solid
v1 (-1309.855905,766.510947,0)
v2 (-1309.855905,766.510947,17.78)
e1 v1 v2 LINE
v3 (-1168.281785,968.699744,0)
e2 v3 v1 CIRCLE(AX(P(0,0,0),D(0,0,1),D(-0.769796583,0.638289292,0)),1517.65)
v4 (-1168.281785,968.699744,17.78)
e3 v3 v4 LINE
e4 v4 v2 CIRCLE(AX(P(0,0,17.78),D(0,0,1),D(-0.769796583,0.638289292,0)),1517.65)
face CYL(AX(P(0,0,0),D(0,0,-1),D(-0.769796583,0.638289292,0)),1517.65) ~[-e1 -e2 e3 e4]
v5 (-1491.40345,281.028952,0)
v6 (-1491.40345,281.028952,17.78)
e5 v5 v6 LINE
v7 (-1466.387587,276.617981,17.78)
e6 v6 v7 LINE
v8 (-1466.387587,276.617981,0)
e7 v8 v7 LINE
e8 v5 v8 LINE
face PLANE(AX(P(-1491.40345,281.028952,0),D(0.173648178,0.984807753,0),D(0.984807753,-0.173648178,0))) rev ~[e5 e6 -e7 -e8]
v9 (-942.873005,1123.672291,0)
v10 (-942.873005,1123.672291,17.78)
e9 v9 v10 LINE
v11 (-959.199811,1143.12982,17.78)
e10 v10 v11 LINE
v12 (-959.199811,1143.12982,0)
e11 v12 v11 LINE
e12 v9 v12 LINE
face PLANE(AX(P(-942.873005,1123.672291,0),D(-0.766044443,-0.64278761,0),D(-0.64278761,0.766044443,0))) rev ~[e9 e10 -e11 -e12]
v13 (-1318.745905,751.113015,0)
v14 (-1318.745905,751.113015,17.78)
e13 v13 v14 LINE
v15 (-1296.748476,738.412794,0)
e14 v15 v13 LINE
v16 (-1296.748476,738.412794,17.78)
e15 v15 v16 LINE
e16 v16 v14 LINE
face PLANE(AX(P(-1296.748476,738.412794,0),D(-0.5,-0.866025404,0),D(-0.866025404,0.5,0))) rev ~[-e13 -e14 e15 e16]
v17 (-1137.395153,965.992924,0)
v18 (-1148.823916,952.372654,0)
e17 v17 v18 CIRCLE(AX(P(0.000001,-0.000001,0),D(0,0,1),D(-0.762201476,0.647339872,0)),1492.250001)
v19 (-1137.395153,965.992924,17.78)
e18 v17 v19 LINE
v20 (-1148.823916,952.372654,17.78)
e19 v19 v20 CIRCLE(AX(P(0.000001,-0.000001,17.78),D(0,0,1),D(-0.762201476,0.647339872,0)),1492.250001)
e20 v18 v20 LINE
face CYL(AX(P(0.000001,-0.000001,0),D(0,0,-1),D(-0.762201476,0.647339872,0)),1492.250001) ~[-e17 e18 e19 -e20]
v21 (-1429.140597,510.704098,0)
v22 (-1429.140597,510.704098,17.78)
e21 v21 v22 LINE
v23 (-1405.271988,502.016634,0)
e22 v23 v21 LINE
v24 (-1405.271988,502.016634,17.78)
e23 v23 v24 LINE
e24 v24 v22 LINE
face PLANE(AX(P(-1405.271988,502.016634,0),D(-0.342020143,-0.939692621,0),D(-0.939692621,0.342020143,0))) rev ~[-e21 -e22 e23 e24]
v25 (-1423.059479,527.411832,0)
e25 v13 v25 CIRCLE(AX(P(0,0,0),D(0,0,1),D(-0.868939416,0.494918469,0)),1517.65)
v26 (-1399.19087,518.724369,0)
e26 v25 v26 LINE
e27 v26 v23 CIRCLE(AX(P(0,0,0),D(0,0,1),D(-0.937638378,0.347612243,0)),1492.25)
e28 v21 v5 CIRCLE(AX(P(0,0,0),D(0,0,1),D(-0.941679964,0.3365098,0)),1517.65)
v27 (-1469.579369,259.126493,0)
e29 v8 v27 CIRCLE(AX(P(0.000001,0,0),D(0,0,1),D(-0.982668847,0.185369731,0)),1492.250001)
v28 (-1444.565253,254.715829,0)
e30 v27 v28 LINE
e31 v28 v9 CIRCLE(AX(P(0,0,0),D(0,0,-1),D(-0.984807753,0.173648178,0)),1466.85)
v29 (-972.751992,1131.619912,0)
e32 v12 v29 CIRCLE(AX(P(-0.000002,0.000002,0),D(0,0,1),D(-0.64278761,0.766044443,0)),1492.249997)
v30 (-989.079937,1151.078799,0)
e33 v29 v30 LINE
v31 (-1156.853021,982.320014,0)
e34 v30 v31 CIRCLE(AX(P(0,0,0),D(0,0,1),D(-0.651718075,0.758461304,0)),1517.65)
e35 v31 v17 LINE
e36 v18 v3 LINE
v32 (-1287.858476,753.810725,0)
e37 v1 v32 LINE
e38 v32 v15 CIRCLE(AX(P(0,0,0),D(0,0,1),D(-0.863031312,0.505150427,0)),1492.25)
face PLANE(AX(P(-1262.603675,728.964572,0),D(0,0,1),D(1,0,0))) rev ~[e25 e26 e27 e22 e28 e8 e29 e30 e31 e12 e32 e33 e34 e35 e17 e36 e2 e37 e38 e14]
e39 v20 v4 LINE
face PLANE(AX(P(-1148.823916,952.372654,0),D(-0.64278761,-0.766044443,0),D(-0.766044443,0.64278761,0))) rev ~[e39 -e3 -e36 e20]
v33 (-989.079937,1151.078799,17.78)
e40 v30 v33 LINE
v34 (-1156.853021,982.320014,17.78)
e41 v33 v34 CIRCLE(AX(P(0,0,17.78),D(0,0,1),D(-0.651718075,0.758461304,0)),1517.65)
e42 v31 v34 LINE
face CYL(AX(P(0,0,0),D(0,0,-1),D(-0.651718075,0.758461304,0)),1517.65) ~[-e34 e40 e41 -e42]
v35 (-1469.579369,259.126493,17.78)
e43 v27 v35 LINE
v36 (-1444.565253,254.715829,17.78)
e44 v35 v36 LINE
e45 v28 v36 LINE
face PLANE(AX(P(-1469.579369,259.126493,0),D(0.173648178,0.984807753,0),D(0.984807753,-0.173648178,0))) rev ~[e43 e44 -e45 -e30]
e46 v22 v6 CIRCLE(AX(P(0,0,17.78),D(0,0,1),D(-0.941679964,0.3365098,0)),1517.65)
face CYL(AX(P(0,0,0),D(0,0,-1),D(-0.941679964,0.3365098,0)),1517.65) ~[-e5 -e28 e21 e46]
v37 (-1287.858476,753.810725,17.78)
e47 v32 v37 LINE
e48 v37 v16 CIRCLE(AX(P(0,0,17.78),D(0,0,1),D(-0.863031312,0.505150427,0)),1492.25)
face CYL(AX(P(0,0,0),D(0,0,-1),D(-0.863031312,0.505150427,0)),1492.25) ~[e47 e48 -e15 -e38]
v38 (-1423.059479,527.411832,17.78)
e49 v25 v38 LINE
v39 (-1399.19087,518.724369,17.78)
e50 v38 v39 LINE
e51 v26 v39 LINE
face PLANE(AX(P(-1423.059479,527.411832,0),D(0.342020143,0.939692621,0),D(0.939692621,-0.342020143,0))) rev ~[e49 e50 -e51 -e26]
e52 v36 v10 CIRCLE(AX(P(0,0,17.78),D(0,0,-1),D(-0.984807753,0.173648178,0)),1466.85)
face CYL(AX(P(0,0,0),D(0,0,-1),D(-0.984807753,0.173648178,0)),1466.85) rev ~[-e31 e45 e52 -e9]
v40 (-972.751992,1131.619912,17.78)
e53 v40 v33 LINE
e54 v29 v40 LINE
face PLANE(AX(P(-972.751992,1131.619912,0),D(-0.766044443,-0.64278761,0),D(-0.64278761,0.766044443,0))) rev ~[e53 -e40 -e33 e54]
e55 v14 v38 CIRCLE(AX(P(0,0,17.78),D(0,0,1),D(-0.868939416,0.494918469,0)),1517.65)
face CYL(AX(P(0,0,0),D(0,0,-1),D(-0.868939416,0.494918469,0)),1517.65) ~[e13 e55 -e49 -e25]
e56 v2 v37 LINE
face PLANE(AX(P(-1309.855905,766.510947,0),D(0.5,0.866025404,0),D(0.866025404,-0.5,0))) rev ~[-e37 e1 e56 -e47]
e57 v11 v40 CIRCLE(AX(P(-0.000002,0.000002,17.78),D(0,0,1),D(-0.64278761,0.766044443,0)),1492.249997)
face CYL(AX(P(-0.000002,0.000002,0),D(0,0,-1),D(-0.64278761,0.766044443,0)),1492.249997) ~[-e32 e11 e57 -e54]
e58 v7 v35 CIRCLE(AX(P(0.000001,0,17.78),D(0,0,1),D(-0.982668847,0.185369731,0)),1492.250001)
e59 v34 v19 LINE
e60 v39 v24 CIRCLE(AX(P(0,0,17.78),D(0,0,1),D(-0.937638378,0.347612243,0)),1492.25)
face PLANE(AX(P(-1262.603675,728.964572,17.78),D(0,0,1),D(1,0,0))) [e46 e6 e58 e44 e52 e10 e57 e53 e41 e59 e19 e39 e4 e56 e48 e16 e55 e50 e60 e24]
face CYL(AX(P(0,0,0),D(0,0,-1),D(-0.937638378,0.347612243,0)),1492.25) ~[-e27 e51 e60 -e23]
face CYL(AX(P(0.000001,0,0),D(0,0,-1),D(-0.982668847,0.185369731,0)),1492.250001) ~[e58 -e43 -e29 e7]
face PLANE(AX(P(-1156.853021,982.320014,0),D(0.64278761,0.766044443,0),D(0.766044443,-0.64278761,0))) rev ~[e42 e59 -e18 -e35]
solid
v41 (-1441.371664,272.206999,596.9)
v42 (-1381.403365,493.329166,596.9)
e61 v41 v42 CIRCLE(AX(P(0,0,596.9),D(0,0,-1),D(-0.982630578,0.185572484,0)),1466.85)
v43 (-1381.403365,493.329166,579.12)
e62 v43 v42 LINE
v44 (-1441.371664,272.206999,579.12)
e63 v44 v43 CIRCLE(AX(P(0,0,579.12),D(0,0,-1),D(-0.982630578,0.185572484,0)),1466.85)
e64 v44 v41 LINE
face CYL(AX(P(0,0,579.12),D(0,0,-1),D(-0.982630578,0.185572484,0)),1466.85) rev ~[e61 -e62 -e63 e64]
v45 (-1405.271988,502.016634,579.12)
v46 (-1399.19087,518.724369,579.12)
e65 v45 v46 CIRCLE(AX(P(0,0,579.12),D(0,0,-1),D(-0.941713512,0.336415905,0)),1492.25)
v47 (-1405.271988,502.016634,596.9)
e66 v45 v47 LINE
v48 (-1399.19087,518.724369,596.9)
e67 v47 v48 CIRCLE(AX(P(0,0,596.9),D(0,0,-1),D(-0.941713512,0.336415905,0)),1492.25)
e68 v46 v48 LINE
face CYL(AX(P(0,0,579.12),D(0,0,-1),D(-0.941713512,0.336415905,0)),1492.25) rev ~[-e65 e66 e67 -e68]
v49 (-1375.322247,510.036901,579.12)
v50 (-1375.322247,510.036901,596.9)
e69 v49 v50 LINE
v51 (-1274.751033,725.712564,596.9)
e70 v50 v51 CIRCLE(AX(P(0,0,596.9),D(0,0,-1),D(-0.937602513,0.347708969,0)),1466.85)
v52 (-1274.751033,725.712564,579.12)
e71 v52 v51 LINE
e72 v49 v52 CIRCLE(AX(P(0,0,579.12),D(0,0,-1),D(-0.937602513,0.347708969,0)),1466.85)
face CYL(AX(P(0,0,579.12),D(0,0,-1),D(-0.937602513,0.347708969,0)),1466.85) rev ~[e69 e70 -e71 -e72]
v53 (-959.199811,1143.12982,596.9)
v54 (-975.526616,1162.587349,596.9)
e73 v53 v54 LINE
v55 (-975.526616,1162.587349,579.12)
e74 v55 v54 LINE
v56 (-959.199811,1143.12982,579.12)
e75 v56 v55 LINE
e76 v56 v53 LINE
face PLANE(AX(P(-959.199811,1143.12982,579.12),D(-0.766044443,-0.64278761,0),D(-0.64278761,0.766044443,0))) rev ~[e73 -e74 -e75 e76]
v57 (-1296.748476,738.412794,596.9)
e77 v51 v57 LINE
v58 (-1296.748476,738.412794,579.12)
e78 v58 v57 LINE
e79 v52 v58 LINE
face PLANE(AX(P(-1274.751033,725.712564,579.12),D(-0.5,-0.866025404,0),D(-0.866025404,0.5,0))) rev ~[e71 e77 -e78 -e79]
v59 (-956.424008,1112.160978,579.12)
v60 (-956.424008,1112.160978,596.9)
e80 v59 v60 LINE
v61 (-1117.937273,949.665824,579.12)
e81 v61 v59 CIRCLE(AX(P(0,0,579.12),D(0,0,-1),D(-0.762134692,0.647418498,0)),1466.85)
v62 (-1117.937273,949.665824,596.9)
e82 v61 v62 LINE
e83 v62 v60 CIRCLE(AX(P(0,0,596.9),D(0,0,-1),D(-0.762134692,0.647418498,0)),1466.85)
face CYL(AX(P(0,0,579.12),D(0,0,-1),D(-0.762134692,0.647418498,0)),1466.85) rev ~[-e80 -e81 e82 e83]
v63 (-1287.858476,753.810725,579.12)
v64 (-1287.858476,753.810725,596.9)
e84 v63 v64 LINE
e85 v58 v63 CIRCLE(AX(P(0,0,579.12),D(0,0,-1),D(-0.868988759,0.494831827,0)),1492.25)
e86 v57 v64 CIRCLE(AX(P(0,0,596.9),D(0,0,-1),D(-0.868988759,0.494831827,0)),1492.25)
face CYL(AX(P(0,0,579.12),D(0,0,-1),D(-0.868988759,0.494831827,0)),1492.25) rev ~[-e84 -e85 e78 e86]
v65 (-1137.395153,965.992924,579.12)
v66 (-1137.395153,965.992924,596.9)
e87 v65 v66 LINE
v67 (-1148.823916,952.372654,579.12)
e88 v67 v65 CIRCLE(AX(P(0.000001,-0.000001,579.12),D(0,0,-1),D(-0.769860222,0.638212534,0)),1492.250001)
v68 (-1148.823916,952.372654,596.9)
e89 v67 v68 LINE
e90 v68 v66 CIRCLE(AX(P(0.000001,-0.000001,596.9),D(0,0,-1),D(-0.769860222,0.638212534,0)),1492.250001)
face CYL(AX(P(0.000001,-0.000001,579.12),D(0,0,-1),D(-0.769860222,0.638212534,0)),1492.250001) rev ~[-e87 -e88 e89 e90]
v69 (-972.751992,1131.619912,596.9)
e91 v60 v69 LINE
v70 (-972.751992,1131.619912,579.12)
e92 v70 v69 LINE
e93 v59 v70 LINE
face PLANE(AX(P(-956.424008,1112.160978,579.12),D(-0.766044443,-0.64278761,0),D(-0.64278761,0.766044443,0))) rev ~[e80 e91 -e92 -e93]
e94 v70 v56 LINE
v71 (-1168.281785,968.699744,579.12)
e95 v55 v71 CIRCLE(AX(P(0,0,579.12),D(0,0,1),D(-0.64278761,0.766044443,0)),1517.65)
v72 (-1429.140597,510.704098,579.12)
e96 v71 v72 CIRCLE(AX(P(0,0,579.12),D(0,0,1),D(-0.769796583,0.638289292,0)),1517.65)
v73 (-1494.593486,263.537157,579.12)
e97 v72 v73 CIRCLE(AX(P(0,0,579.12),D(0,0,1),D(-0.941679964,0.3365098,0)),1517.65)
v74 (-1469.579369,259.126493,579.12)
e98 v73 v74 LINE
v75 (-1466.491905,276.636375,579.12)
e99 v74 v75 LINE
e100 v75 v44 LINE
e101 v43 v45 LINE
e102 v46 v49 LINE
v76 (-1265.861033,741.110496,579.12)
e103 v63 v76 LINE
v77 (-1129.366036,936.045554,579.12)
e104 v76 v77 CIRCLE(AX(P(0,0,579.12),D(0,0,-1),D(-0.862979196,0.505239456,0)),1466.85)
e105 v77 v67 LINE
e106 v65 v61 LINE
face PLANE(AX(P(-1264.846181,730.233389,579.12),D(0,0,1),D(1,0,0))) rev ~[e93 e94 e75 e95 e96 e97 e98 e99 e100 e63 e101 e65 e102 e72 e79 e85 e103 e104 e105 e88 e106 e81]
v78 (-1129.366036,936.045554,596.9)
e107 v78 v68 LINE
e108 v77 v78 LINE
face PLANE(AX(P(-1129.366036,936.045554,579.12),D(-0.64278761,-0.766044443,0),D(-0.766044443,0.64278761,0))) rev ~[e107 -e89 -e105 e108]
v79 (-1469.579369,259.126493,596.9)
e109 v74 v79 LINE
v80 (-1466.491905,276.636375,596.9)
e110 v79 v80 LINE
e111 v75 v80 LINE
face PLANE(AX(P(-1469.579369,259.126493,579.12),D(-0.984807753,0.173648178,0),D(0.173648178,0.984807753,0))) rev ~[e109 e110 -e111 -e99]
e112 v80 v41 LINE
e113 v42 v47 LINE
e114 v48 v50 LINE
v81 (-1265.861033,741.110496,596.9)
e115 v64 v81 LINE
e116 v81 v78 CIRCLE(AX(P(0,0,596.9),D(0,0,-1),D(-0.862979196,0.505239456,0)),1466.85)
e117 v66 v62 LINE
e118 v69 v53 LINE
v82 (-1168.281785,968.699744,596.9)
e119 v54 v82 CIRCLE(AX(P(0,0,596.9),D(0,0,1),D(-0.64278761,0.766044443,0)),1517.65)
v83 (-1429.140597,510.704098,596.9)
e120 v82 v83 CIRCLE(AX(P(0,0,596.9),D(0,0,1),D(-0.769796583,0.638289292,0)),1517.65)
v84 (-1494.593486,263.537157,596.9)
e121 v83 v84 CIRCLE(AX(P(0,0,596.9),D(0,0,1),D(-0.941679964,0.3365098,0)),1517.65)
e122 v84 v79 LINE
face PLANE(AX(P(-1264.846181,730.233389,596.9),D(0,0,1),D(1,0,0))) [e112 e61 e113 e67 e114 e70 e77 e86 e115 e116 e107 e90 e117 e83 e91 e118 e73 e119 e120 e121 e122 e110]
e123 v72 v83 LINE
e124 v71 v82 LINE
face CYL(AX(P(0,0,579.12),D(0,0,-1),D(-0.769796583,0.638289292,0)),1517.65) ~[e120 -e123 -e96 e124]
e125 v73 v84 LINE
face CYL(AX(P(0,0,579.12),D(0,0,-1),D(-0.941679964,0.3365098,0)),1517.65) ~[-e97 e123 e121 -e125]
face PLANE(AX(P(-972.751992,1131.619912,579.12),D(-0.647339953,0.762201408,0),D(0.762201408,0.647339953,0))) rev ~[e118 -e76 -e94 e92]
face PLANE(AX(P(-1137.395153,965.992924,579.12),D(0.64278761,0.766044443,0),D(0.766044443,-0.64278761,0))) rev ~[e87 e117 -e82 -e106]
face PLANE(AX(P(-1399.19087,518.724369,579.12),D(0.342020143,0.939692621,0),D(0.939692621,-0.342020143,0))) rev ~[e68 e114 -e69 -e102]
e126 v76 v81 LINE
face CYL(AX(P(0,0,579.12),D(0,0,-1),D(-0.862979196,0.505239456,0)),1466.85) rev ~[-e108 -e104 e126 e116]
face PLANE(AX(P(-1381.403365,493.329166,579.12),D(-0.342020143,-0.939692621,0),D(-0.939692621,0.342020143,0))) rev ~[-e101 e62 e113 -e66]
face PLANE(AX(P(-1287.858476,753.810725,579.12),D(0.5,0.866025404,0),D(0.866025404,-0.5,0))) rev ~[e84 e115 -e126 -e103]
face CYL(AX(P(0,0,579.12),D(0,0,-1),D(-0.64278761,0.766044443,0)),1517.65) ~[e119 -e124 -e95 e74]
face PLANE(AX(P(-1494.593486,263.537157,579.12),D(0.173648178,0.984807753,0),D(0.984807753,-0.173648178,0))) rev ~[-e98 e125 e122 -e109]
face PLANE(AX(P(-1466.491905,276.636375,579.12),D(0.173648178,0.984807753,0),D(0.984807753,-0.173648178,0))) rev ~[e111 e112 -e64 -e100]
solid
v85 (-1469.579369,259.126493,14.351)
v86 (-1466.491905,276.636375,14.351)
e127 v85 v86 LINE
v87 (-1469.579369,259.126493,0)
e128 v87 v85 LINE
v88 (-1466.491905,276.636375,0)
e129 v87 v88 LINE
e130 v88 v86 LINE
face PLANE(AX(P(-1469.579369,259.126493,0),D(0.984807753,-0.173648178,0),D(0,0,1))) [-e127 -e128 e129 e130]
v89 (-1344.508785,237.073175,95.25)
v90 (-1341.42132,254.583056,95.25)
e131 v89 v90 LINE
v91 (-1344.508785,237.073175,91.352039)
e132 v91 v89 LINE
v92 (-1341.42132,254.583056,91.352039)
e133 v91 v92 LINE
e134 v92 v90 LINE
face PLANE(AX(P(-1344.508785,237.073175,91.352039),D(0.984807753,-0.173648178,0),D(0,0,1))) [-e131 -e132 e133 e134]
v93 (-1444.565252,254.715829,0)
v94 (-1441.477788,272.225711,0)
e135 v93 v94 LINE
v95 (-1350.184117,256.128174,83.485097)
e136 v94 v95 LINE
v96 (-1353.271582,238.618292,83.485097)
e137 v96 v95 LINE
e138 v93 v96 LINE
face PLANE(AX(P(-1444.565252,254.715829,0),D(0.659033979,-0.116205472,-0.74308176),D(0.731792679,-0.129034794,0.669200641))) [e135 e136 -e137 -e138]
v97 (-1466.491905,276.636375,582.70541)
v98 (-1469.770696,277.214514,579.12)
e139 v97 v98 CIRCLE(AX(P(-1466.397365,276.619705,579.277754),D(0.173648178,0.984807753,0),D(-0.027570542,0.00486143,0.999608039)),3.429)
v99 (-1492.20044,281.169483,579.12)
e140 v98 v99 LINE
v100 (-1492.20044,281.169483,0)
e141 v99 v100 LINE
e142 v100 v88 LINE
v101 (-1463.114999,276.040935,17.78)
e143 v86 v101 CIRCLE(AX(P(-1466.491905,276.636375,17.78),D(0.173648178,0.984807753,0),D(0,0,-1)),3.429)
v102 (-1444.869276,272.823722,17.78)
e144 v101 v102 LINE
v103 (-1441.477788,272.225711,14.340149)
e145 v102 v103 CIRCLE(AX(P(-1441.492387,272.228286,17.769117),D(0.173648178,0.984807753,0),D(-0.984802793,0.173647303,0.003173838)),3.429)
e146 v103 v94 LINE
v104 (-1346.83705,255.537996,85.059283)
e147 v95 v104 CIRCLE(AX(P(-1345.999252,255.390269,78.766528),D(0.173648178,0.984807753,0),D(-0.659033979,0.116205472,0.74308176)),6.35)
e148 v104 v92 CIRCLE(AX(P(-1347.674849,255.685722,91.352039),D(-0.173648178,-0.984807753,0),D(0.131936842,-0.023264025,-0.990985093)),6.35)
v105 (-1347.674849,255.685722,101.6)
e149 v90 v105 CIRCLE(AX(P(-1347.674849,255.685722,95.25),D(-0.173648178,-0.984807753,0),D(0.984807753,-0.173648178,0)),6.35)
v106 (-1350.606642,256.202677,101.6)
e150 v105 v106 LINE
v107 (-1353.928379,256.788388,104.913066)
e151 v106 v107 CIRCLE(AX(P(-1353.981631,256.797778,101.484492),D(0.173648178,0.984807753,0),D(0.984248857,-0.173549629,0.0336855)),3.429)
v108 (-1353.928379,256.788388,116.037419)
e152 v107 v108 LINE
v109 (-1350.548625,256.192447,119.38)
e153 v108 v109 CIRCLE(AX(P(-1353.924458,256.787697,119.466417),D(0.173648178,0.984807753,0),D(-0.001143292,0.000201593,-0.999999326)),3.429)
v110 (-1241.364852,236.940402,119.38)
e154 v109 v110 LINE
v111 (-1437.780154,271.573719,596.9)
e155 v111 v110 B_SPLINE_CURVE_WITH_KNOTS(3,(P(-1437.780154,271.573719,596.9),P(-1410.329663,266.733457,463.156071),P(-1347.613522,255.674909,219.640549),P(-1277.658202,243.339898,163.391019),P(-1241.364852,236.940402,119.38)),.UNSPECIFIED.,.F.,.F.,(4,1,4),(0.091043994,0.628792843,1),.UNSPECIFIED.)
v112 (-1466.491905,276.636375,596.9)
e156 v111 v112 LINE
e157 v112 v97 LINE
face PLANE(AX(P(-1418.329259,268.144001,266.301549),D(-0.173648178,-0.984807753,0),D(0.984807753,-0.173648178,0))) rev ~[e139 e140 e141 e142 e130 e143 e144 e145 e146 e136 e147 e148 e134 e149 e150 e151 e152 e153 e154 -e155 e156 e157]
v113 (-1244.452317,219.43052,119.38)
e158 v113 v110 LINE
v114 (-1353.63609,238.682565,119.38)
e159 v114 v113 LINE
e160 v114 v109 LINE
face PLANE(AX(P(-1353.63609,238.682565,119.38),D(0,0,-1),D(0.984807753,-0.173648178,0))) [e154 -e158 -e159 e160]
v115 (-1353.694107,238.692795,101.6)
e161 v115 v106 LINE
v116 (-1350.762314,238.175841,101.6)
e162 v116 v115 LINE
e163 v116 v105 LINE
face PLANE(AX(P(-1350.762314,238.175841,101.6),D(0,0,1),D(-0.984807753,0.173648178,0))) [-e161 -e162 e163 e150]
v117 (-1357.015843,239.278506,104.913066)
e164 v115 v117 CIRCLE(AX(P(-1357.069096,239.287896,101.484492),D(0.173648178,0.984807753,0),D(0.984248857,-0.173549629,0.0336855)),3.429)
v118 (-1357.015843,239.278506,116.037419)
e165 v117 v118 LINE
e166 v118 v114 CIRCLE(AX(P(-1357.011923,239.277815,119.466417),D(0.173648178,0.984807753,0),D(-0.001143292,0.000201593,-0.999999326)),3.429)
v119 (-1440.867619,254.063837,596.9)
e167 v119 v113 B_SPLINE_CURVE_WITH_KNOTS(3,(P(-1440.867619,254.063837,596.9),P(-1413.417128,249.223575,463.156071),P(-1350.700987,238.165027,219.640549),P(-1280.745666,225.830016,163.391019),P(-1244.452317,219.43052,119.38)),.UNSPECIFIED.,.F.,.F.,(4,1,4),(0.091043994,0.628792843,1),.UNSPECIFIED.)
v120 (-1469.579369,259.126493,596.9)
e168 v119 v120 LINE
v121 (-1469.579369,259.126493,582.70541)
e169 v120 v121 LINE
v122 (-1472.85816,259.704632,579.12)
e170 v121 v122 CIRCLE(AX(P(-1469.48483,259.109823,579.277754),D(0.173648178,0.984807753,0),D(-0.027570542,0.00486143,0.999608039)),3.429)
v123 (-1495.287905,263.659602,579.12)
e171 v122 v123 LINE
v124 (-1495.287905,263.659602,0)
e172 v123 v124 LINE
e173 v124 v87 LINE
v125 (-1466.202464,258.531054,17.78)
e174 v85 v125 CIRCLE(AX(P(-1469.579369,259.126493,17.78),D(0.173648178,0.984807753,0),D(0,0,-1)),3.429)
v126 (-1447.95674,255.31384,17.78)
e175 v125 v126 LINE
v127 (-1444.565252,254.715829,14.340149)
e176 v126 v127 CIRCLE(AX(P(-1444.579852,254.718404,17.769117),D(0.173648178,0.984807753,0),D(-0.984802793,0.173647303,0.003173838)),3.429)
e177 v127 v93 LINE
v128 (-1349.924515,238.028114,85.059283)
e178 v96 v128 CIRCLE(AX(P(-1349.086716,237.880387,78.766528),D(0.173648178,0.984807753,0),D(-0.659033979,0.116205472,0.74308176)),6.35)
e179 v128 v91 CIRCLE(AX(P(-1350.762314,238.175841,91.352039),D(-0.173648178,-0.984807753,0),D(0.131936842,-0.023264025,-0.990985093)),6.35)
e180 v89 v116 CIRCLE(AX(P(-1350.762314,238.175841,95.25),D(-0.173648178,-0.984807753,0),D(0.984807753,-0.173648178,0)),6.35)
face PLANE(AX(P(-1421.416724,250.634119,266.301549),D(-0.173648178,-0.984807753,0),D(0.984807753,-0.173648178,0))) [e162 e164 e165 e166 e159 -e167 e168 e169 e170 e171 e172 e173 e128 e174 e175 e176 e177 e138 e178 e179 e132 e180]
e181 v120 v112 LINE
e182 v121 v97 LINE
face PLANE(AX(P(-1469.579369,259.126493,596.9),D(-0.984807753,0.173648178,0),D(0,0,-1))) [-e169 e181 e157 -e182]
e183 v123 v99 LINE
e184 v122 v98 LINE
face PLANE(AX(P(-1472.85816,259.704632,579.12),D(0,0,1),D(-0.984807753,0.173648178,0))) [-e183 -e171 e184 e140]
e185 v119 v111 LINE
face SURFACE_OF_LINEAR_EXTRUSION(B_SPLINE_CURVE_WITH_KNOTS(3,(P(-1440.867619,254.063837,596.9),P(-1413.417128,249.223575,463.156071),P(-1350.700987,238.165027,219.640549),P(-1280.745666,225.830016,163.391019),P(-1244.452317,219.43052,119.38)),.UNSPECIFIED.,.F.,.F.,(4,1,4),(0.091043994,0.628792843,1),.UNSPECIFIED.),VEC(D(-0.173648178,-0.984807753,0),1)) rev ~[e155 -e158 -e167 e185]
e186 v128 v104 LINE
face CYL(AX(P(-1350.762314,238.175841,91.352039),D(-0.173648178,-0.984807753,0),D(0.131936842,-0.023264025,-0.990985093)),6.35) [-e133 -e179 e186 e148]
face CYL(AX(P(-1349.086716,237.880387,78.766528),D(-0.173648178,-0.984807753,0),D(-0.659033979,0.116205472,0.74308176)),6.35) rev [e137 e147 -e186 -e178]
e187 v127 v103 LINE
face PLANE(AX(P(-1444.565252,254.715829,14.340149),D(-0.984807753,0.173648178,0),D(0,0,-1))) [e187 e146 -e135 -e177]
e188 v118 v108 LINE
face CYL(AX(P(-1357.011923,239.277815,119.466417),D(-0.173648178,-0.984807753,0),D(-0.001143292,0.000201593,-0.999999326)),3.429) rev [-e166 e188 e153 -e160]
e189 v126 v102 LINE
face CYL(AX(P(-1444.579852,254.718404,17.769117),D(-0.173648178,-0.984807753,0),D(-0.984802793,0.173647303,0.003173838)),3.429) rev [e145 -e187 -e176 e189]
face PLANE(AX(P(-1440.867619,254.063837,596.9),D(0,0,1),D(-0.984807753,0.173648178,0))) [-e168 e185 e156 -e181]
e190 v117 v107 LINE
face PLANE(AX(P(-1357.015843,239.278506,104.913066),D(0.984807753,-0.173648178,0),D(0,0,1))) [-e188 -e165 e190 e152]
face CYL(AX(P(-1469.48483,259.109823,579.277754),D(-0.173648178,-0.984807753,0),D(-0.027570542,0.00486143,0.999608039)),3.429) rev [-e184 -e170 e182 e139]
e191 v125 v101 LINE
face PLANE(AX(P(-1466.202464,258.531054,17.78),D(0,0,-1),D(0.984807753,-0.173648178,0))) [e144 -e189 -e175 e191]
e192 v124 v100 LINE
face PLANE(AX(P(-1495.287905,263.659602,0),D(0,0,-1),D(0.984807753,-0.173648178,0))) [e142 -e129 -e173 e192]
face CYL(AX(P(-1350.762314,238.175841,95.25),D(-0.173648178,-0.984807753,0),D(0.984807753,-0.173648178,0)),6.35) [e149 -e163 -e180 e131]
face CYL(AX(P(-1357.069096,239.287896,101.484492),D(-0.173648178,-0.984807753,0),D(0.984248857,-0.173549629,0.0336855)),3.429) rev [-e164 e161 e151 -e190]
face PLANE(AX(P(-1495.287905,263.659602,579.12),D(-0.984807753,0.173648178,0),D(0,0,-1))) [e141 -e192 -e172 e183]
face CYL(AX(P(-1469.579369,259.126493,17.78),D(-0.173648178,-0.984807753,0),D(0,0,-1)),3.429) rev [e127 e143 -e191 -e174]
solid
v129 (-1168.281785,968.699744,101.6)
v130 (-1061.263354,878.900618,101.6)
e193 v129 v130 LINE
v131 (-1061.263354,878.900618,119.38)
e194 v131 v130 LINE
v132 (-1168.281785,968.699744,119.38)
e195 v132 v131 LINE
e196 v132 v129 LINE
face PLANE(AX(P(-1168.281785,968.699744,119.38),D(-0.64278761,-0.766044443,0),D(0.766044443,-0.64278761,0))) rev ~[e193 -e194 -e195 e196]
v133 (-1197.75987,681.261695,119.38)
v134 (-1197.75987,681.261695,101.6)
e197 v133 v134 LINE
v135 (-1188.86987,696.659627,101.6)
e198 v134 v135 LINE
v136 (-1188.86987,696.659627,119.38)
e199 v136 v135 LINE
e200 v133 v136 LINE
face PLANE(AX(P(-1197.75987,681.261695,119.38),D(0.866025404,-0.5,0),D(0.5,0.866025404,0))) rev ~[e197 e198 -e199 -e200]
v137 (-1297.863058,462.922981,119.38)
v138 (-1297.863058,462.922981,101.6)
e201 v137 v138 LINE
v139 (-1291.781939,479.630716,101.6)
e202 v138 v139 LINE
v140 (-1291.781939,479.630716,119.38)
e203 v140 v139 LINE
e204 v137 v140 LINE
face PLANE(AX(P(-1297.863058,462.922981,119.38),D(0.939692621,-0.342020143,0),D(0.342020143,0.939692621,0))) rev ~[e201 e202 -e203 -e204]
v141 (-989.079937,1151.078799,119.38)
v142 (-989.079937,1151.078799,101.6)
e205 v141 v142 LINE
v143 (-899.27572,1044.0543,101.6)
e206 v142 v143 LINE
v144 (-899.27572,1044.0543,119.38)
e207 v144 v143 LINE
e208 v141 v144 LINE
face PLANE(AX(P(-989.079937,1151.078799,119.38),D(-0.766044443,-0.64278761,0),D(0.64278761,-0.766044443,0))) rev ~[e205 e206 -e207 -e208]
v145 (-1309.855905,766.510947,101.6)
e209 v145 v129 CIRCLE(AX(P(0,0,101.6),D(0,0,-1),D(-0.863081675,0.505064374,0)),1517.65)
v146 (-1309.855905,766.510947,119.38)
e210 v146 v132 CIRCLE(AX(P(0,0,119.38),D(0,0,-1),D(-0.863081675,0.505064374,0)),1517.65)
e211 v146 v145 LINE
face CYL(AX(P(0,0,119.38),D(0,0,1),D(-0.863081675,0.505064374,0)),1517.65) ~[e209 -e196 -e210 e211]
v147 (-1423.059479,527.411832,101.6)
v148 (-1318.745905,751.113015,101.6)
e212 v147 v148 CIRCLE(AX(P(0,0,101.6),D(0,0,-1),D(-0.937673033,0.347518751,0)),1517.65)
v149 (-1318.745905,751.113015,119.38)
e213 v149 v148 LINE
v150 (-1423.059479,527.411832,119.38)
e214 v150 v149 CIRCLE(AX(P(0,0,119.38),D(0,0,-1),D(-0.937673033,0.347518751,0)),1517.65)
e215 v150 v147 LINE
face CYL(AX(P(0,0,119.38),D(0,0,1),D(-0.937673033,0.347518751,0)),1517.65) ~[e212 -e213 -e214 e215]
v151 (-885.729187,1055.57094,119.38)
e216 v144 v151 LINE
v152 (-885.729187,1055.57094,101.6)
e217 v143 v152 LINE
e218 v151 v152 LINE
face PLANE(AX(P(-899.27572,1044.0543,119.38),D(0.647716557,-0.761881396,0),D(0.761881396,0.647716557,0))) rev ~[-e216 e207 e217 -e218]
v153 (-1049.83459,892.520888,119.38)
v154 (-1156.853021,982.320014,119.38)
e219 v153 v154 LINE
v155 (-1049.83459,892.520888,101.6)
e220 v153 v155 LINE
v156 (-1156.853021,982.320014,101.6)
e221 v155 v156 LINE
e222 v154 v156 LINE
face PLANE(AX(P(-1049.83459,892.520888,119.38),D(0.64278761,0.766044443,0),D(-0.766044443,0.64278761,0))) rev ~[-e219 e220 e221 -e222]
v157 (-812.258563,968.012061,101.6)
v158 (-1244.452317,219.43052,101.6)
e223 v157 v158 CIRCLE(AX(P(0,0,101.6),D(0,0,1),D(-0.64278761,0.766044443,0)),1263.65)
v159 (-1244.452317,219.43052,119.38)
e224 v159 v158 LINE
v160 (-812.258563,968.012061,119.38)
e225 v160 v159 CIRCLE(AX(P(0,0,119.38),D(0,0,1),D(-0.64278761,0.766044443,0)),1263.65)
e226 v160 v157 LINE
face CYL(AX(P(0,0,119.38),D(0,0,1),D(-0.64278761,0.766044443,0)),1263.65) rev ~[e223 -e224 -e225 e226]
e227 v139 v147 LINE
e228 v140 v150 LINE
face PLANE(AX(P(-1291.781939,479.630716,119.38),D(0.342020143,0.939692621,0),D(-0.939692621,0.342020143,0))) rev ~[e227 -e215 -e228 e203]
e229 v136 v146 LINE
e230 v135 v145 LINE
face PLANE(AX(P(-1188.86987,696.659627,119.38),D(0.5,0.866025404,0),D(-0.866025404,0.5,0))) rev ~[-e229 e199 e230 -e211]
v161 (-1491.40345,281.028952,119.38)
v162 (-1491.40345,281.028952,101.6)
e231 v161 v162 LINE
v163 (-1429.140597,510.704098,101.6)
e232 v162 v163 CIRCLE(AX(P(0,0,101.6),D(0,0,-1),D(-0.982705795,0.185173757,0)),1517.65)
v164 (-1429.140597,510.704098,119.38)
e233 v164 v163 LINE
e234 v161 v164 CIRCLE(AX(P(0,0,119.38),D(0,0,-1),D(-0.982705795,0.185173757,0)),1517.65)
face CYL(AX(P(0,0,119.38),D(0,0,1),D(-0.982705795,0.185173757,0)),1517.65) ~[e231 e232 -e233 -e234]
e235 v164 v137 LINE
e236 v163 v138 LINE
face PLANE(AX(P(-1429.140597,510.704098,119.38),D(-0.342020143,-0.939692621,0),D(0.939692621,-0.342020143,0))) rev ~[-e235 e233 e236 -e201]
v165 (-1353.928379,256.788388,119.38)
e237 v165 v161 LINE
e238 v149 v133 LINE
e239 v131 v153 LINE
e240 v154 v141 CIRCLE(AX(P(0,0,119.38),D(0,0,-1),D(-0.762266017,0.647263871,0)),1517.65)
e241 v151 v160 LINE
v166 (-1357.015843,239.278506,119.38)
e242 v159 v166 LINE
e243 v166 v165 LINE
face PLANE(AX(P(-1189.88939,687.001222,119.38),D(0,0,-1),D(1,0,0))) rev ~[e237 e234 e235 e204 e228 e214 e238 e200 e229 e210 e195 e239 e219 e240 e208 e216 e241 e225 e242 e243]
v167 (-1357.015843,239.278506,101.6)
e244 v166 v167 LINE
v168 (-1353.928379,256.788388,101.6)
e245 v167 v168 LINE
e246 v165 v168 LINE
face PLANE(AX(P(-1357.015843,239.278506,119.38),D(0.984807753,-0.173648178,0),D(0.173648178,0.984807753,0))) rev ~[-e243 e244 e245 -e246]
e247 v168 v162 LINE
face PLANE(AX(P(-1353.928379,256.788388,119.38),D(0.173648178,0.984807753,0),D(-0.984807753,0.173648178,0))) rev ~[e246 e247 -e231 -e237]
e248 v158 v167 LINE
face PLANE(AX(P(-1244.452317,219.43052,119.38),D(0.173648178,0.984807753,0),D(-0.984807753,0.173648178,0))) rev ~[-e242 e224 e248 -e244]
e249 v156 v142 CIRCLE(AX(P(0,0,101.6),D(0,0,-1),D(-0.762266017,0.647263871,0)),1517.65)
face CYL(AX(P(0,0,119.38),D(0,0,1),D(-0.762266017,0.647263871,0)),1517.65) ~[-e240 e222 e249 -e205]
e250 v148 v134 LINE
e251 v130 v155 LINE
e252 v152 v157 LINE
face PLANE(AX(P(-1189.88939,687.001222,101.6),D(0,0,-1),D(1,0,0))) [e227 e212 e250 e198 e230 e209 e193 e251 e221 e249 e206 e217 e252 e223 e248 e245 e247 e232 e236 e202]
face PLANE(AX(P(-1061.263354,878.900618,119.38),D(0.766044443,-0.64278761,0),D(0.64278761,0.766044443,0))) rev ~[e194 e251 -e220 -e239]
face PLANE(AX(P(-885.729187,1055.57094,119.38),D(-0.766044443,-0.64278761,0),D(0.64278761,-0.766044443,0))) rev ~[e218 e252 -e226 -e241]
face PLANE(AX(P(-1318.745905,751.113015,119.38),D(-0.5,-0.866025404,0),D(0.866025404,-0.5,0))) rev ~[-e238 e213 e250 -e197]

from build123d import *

# Parameters (mm, degrees)
F1_DEPTH = 17.78
F3_DEPTH = 17.78
F5_DEPTH = 17.78
F8_DEPTH = 17.78


with BuildPart() as f1:
    # F0 (on Top) → F1 (new body)
    with BuildSketch(Plane.XY):
        with BuildLine():
            Line((-942.8730052687, 1123.6722913891), (-959.1998105547, 1143.1298202443))
            ThreePointArc((-959.1998105547, 1143.1298202443), (-965.9930441933, 1137.395050574), (-972.7519920849, 1131.6199116288))
            Line((-972.7519920849, 1131.6199116288), (-989.0799370092, 1151.0787986519))
            ThreePointArc((-989.0799370092, 1151.0787986519), (-1076.2792142324, 1069.9927922707), (-1156.8530210759, 982.3200141133))
            Line((-1156.8530210759, 982.3200141133), (-1137.3951527054, 965.9929239401))
            ThreePointArc((-1137.3951527054, 965.9929239401), (-1143.1298202443, 959.1998105547), (-1148.8239164056, 952.3726537414))
            Line((-1148.8239164056, 952.3726537414), (-1168.2817847761, 968.6997439146))
            ThreePointArc((-1168.2817847761, 968.6997439146), (-1243.1861000152, 870.4882786282), (-1309.8559045877, 766.5109468995))
            Line((-1309.8559045877, 766.5109468995), (-1287.8584755041, 753.8107252966))
            ThreePointArc((-1287.8584755041, 753.8107252966), (-1292.3264087973, 746.125), (-1296.7484755041, 738.4127936173))
            Line((-1296.7484755041, 738.4127936173), (-1318.7459045877, 751.1130152202))
            ThreePointArc((-1318.7459045877, 751.1130152202), (-1375.4580129962, 641.3866049308), (-1423.0594792576, 527.4118324374))
            Line((-1423.0594792576, 527.4118324374), (-1399.1908702125, 518.7243692117))
            ThreePointArc((-1399.1908702125, 518.7243692117), (-1402.2563133678, 510.3795588777), (-1405.2719883608, 502.0166344141))
            Line((-1405.2719883608, 502.0166344141), (-1429.140597406, 510.7040976399))
            ThreePointArc((-1429.140597406, 510.7040976399), (-1464.7805470889, 397.088744955), (-1491.4034498948, 281.0289524975))
            Line((-1491.4034498948, 281.0289524975), (-1466.3875869413, 276.6179809131))
            ThreePointArc((-1466.3875869413, 276.6179809131), (-1468.0095300324, 267.8769908634), (-1469.5793694325, 259.1264931235))
            Line((-1469.5793694325, 259.1264931235), (-1444.565252506, 254.7158294107))
            ThreePointArc((-1444.565252506, 254.7158294107), (-1270.3293635412, 733.425), (-942.8730052687, 1123.6722913891))
        make_face()
    extrude(amount=F1_DEPTH)


with BuildPart() as f3:
    # F2 (on face) → F3 (new body)
    with BuildSketch(Plane(origin=(0, 0, 0), x_dir=(0.984807753, -0.1736481777, 0), z_dir=(-0.1736481777, -0.984807753, 0))):
        with BuildLine():
            Line((-1518.3551311493, 0), (-1492.25, 0))
            Line((-1492.25, 0), (-1492.25, 14.351))
            ThreePointArc((-1492.25, 14.351), (-1494.6746691527, 20.2046691527), (-1488.821, 17.78))
            Line((-1488.821, 17.78), (-1470.2938070244, 17.78))
            ThreePointArc((-1470.2938070244, 17.78), (-1464.4415489784, 20.1951790962), (-1466.85, 14.3401489527))
            Line((-1466.85, 14.3401489527), (-1466.85, 0))
            Line((-1466.85, 0), (-1374.1479773797, 83.4850971333))
            ThreePointArc((-1374.1479773797, 83.4850971333), (-1372.5673341992, 84.5284814934), (-1370.7492766555, 85.0592832973))
            ThreePointArc((-1370.7492766555, 85.0592832973), (-1366.8185465998, 87.1734978195), (-1365.25, 91.3520386391))
            Line((-1365.25, 91.3520386391), (-1365.25, 95.25))
            ThreePointArc((-1365.25, 95.25), (-1367.1098719395, 99.7401280605), (-1371.6, 101.6))
            Line((-1371.6, 101.6), (-1374.5770201141, 101.6))
            ThreePointArc((-1374.5770201141, 101.6), (-1380.4069192448, 99.0381939532), (-1377.95, 104.9130660301))
            Line((-1377.95, 104.9130660301), (-1377.95, 116.0374188485))
            ThreePointArc((-1377.95, 116.0374188485), (-1380.3385150421, 121.9228376163), (-1374.5181082663, 119.38))
            Line((-1374.5181082663, 119.38), (-1263.6500000001, 119.38))
            add(Edge.make_bspline(
                [(-1463.0953241153, 596.9), (-1435.2213655624, 463.1560709507), (-1371.53772684, 219.6405486266), (-1300.5032324543, 163.3910187016), (-1263.6500000001, 119.38)],
                knots=[0.0910439939, 0.0910439939, 0.0910439939, 0.0910439939, 0.6287928425, 1, 1, 1, 1], degree=3))
            Line((-1463.0953241153, 596.9), (-1492.25, 596.9))
            Line((-1492.25, 596.9), (-1492.25, 582.7054097958))
            ThreePointArc((-1492.25, 582.7054097958), (-1489.6412751046, 576.9444635359), (-1495.5793714733, 579.12))
            Line((-1495.5793714733, 579.12), (-1518.3551311493, 579.12))
            Line((-1518.3551311493, 579.12), (-1518.3551311493, 0))
        make_face()
    extrude(amount=-F3_DEPTH)


with BuildPart() as f5:
    # F4 (on face) → F5 (new body)
    with BuildSketch(Plane.XY.offset(579.12)):
        with BuildLine():
            ThreePointArc((-1168.2817847761, 968.6997439146), (-1243.1861000152, 870.4882786282), (-1309.8559045877, 766.5109468995))
            ThreePointArc((-1309.8559045877, 766.5109468995), (-1375.4580129962, 641.3866049308), (-1429.140597406, 510.7040976399))
            ThreePointArc((-1429.140597406, 510.7040976399), (-1467.0814981789, 388.5014803077), (-1494.593486359, 263.5371568362))
            Line((-1494.593486359, 263.5371568362), (-1469.5793694325, 259.1264931235))
            Line((-1469.5793694325, 259.1264931235), (-1466.4919048335, 276.636374972))
            Line((-1466.4919048335, 276.636374972), (-1441.3716635128, 272.2069986653))
            ThreePointArc((-1441.3716635128, 272.2069986653), (-1415.7112941773, 383.940690783), (-1381.4033648918, 493.3291659385))
            Line((-1381.4033648918, 493.3291659385), (-1405.2719883608, 502.0166344141))
            ThreePointArc((-1405.2719883608, 502.0166344141), (-1402.2563133678, 510.3795588777), (-1399.1908702125, 518.7243692117))
            Line((-1399.1908702125, 518.7243692117), (-1375.3222467435, 510.0369007361))
            ThreePointArc((-1375.3222467435, 510.0369007361), (-1329.4175774147, 619.9175972343), (-1274.7510331275, 725.7125643397))
            Line((-1274.7510331275, 725.7125643397), (-1296.7484755041, 738.4127936173))
            ThreePointArc((-1296.7484755041, 738.4127936173), (-1292.3264087973, 746.125), (-1287.8584755041, 753.8107252966))
            Line((-1287.8584755041, 753.8107252966), (-1265.8610331275, 741.110496019))
            ThreePointArc((-1265.8610331275, 741.110496019), (-1201.5731761653, 841.3505956615), (-1129.3660362767, 936.0455537017))
            Line((-1129.3660362767, 936.0455537017), (-1148.8239164056, 952.3726537414))
            ThreePointArc((-1148.8239164056, 952.3726537414), (-1143.1298202443, 959.1998105547), (-1137.3951527054, 965.9929239401))
            Line((-1137.3951527054, 965.9929239401), (-1117.9372725764, 949.6658239004))
            ThreePointArc((-1117.9372725764, 949.6658239004), (-1040.3580388533, 1034.0715997906), (-956.4240076884, 1112.1609775645))
            Line((-956.4240076884, 1112.1609775645), (-972.7519920849, 1131.6199116288))
            Line((-972.7519920849, 1131.6199116288), (-959.1998105547, 1143.1298202443))
            Line((-959.1998105547, 1143.1298202443), (-975.5266158408, 1162.5873490995))
            ThreePointArc((-975.5266158408, 1162.5873490995), (-1076.2791066912, 1069.9929004437), (-1168.2817847761, 968.6997439146))
        make_face()
    extrude(amount=F5_DEPTH)


with BuildPart() as f8:
    # F7 (on face) → F8 (new body)
    with BuildSketch(Plane(origin=(0, 0, 119.38), x_dir=(1, 0, 0), z_dir=(0, 0, -1))):
        with BuildLine():
            Line((-1357.0158432632, -239.2785064161), (-1353.9283786643, -256.7883882647))
            Line((-1353.9283786643, -256.7883882647), (-1491.4034498948, -281.0289524975))
            ThreePointArc((-1491.4034498948, -281.0289524975), (-1464.7805470889, -397.088744955), (-1429.140597406, -510.7040976399))
            Line((-1429.140597406, -510.7040976399), (-1297.8630576463, -462.9229807397))
            Line((-1297.8630576463, -462.9229807397), (-1291.781939498, -479.6307155373))
            Line((-1291.781939498, -479.6307155373), (-1423.0594792576, -527.4118324374))
            ThreePointArc((-1423.0594792576, -527.4118324374), (-1375.4580129962, -641.3866049308), (-1318.7459045877, -751.1130152202))
            Line((-1318.7459045877, -751.1130152202), (-1197.7598695127, -681.2616953015))
            Line((-1197.7598695127, -681.2616953015), (-1188.8698695127, -696.6596269808))
            Line((-1188.8698695127, -696.6596269808), (-1309.8559045877, -766.5109468995))
            ThreePointArc((-1309.8559045877, -766.5109468995), (-1243.1861000152, -870.4882786282), (-1168.2817847761, -968.6997439146))
            Line((-1168.2817847761, -968.6997439146), (-1061.2633538396, -878.9006179866))
            Line((-1061.2633538396, -878.9006179866), (-1049.8345901393, -892.5208881852))
            Line((-1049.8345901393, -892.5208881852), (-1156.8530210759, -982.3200141133))
            ThreePointArc((-1156.8530210759, -982.3200141133), (-1076.2792142324, -1069.9927922707), (-989.0799370092, -1151.0787986519))
            Line((-989.0799370092, -1151.0787986519), (-899.2757199376, -1044.0543003268))
            Line((-899.2757199376, -1044.0543003268), (-885.7291867676, -1055.5709403958))
            Line((-885.7291867676, -1055.5709403958), (-812.2585629805, -968.0120605474))
            ThreePointArc((-812.2585629805, -968.0120605474), (-1094.3530014923, -631.825), (-1244.452317094, -219.4305197088))
            Line((-1244.452317094, -219.4305197088), (-1357.0158432632, -239.2785064161))
        make_face()
    extrude(amount=F8_DEPTH)


solid = Compound([f1.part, f3.part, f5.part, f8.part])
